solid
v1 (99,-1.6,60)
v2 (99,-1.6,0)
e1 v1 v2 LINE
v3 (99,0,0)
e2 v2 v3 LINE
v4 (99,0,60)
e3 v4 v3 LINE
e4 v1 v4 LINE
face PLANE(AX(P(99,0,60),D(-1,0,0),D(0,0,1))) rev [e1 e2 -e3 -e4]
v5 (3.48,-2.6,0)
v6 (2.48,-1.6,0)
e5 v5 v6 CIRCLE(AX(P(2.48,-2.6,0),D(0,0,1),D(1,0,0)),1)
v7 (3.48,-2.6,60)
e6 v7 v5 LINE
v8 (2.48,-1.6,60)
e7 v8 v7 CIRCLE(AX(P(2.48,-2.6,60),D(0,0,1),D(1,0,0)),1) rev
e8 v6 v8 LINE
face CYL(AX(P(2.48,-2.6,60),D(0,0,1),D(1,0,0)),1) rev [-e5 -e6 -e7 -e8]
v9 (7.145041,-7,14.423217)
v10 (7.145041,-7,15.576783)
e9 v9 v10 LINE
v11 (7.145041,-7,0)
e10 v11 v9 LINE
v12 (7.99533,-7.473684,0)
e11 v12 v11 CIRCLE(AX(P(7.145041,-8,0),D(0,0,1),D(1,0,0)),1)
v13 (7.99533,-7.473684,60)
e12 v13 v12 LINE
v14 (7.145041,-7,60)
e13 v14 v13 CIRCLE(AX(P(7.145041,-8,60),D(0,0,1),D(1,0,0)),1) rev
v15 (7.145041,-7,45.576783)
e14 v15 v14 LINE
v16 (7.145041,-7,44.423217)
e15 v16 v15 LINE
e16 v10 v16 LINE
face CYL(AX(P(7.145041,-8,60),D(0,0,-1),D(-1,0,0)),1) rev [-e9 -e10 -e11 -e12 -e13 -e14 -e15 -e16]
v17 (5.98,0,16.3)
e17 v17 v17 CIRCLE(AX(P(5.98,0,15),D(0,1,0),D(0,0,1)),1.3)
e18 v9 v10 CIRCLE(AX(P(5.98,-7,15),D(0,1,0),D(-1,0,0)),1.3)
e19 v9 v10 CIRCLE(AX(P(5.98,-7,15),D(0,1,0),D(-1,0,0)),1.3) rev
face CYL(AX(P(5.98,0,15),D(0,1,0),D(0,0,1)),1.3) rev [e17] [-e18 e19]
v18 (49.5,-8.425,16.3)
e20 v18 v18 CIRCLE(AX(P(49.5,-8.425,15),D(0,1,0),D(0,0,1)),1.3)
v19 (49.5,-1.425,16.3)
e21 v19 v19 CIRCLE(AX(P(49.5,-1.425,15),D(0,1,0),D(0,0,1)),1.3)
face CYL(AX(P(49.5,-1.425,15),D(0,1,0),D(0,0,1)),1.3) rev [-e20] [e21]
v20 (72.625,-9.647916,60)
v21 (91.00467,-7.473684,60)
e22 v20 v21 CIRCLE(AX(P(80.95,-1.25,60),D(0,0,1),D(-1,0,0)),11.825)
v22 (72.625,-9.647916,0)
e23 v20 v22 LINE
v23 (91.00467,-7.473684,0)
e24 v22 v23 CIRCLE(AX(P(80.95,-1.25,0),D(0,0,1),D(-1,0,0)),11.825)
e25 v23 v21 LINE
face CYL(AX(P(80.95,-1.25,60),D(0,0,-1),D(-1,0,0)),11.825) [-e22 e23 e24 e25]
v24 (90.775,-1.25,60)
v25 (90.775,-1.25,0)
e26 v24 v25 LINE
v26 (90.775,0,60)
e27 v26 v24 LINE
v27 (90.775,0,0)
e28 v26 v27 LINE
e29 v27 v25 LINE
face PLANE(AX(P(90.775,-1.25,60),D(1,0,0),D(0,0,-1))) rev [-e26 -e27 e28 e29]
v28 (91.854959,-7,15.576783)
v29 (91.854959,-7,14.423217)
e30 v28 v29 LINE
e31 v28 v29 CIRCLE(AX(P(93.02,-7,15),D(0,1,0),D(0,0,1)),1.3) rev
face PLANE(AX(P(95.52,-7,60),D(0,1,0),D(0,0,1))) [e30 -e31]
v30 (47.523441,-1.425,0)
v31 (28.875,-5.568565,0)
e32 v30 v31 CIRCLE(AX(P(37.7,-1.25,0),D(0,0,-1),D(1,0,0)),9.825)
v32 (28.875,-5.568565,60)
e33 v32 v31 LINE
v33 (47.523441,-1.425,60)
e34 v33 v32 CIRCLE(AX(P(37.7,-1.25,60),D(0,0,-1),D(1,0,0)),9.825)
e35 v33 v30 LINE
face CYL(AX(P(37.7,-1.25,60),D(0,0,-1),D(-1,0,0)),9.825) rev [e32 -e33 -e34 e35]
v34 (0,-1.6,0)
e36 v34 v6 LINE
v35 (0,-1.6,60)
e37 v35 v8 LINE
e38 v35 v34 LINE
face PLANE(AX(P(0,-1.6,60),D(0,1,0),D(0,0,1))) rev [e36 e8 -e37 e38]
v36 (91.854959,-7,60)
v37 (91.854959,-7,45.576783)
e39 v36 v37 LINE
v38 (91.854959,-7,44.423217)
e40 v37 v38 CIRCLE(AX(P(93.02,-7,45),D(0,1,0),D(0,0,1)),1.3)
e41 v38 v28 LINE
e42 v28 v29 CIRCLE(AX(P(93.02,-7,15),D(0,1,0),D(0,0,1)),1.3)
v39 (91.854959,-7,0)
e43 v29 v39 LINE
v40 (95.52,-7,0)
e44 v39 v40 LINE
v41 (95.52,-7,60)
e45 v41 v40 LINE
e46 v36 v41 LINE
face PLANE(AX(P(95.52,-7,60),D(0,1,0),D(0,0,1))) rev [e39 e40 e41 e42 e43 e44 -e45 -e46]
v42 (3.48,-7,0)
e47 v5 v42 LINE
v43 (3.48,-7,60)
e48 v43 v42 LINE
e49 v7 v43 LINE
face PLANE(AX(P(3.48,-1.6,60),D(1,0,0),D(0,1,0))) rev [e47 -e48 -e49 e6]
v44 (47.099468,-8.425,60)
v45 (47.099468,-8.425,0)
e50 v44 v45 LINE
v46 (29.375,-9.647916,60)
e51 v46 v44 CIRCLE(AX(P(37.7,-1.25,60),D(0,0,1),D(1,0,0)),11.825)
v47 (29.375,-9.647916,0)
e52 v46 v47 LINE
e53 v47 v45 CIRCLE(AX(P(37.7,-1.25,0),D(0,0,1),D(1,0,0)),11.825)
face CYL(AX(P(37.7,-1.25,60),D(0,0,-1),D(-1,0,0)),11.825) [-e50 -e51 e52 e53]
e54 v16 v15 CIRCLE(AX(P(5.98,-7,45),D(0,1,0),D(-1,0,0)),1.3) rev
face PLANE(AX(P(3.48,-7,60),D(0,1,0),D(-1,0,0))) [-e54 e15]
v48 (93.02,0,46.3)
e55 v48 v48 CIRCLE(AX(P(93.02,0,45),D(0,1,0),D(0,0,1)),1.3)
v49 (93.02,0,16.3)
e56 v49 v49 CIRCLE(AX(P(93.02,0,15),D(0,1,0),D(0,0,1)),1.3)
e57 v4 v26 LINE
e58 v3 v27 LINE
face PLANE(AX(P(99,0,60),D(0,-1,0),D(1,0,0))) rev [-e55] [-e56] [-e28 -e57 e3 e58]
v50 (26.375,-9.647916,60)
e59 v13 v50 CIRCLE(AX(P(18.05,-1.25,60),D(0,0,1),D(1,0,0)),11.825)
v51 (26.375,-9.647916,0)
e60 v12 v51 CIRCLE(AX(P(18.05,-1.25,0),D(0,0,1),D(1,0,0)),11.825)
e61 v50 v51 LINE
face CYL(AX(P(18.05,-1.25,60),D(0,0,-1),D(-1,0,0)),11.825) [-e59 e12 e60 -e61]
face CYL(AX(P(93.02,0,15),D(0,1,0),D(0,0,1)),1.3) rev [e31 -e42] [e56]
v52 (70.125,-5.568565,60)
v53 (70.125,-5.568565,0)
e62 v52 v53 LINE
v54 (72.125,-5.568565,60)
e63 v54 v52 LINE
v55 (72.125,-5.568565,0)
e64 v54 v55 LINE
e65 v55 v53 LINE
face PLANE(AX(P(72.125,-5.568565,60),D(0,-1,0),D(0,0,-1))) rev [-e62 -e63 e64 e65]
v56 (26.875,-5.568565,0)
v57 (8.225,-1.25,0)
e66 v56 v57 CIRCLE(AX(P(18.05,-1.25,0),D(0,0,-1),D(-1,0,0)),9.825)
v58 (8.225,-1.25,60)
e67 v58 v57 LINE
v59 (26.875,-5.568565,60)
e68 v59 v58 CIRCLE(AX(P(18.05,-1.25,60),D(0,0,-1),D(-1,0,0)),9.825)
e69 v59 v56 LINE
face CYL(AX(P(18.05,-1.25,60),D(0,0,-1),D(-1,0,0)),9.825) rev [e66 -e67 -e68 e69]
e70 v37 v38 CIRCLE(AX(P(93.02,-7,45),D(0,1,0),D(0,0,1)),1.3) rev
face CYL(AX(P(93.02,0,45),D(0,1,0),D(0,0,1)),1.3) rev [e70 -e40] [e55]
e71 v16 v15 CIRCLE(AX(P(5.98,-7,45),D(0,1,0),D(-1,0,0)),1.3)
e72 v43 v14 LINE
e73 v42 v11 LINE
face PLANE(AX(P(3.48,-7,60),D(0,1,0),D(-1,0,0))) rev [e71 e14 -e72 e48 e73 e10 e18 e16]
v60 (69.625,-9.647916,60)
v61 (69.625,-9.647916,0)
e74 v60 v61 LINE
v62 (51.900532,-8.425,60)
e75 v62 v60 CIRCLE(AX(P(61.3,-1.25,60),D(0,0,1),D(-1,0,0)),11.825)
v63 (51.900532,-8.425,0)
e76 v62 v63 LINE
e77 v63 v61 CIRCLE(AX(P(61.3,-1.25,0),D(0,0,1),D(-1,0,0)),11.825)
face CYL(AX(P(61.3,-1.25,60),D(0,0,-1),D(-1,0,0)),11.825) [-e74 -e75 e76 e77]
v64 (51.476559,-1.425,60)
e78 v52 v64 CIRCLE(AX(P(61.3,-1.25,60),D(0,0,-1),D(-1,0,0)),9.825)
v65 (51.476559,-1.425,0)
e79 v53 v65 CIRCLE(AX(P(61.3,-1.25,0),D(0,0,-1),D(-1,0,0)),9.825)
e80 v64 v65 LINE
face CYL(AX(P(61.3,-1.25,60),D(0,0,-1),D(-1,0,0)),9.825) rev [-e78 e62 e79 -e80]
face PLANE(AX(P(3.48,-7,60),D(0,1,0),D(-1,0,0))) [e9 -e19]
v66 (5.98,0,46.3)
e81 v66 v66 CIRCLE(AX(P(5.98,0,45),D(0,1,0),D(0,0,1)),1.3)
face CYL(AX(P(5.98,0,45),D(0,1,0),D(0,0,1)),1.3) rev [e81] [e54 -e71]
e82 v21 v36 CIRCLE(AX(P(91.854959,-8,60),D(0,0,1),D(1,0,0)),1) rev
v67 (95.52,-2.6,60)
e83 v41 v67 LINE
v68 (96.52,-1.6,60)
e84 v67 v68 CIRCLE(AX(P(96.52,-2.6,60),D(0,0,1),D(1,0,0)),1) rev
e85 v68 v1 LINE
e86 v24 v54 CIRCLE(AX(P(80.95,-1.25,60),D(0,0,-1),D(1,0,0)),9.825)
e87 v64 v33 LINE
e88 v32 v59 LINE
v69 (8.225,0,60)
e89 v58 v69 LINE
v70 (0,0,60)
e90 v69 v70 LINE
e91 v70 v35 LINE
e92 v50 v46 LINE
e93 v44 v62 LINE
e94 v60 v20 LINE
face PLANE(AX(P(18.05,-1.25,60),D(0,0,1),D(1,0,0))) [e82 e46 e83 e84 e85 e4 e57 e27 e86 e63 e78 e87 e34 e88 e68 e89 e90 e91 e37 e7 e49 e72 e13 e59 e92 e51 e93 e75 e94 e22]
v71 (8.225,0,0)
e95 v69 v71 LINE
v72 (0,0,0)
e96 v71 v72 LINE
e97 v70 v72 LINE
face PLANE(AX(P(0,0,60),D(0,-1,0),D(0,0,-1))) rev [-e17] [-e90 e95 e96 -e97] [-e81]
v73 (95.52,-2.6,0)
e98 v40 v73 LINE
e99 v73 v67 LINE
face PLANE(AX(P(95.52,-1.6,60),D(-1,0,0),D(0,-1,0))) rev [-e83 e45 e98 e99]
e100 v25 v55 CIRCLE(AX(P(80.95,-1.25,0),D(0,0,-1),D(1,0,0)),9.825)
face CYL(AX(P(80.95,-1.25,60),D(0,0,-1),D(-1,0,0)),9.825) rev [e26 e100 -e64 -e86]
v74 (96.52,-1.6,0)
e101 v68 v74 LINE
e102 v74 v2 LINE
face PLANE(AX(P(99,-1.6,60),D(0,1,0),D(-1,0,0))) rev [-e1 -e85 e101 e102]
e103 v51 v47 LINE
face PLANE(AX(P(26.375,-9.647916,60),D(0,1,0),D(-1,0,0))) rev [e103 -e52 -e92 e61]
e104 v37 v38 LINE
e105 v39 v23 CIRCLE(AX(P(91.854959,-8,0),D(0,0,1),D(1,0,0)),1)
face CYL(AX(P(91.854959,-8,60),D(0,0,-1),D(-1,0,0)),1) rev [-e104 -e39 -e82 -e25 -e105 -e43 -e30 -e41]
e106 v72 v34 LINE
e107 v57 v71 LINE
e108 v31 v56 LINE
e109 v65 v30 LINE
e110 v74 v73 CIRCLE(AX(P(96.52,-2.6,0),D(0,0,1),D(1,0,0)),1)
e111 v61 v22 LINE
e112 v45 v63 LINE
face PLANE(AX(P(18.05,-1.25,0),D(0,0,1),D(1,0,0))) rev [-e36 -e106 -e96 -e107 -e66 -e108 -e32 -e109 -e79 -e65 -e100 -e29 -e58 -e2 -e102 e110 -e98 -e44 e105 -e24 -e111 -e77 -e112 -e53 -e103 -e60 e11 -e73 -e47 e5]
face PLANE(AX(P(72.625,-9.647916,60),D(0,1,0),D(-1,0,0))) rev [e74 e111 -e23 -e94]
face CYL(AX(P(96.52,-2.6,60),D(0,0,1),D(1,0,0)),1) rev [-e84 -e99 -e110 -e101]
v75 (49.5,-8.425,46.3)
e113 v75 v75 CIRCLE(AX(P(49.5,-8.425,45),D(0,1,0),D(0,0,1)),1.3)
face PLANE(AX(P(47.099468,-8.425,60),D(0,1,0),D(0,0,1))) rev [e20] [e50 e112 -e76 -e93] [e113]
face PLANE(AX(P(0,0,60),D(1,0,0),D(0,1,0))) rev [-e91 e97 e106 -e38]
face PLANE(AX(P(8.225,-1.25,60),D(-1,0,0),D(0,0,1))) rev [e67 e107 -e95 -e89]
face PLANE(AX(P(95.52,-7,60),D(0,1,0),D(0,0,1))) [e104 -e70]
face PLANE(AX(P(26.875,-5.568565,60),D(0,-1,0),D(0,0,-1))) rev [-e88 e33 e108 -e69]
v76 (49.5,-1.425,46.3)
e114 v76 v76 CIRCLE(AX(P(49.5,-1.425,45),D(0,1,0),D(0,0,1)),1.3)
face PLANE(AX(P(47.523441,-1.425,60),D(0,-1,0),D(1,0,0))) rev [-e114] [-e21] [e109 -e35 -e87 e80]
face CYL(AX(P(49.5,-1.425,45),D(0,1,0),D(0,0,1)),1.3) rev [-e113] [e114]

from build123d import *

# Parameters (mm, degrees)
BOSS_EXTRUDE1_DEPTH                  = 60
FILLET1_R                            = 1
F_2_6_START                          = -7
F_2_6_2_6_DIAMETER_HOLE1_OUTLINE_R   = 1.3
F_2_6_2_6_DIAMETER_HOLE1_DEPTH       = 7
F_2_6_START_2                        = -8.425
F_2_6_2_6_DIAMETER_HOLE1_2_OUTLINE_R = 1.3
F_2_6_2_6_DIAMETER_HOLE1_2_DEPTH     = 1.425


# Read off the part's stored shape, not the designer's step: Ø2.6 (2.6) Diameter Hole1
with BuildPart() as part:
    # Sketch1 → Boss-Extrude1 (new body)
    with BuildSketch(Plane.XY):
        with BuildLine():
            Line((0, 0), (8.225, 0))
            Line((8.225, 0), (8.225, -1.25))
            ThreePointArc((8.225, -1.25), (15.833583974, -10.821735736), (26.875, -5.568564576))
            Line((26.875, -5.568564576), (28.875, -5.568564576))
            ThreePointArc((28.875, -5.568564576), (39.831080274, -10.841095968), (47.523441352, -1.425))
            Line((47.523441352, -1.425), (51.476558648, -1.425))
            ThreePointArc((51.476558648, -1.425), (59.168919726, -10.841095968), (70.125, -5.568564576))
            Line((70.125, -5.568564576), (72.125, -5.568564576))
            ThreePointArc((72.125, -5.568564576), (83.166416026, -10.821735736), (90.775, -1.25))
            Line((90.775, -1.25), (90.775, 0))
            Line((90.775, 0), (99, 0))
            Line((99, 0), (99, -1.6))
            Line((99, -1.6), (95.52, -1.6))
            Line((95.52, -1.6), (95.52, -7))
            Line((95.52, -7), (91.282866253, -7))
            ThreePointArc((91.282866253, -7), (82.611549593, -12.957684568), (72.625, -9.647916408))
            Line((72.625, -9.647916408), (69.625, -9.647916408))
            ThreePointArc((69.625, -9.647916408), (60.486058022, -13.046953991), (51.90053193, -8.425))
            Line((51.90053193, -8.425), (47.09946807, -8.425))
            ThreePointArc((47.09946807, -8.425), (38.513941978, -13.046953991), (29.375, -9.647916408))
            Line((29.375, -9.647916408), (26.375, -9.647916408))
            ThreePointArc((26.375, -9.647916408), (16.388450407, -12.957684568), (7.717133747, -7))
            Line((7.717133747, -7), (3.48, -7))
            Line((3.48, -7), (3.48, -1.6))
            Line((3.48, -1.6), (0, -1.6))
            Line((0, -1.6), (0, 0))
        make_face()
    extrude(amount=BOSS_EXTRUDE1_DEPTH)

    # Fillet1
    fillet1_edges = [part.edges().sort_by_distance(p)[0] for p in [
        (95.52, -1.6, 30),
        (91.282866253, -7, 30),
        (7.717133747, -7, 30),
        (3.48, -1.6, 30),
    ]]
    fillet(fillet1_edges, radius=FILLET1_R)

    # Ø2.6 (2.6) Diameter Hole1 outline → Ø2.6 (2.6) Diameter Hole1 (cut)
    with BuildSketch(Plane(origin=(0, 0, 0), x_dir=(1, 0, 0), z_dir=(0, 1, 0)).offset(F_2_6_START)):
        with Locations((93.02, -15)):
            Circle(F_2_6_2_6_DIAMETER_HOLE1_OUTLINE_R)
        with Locations((93.02, -45)):
            Circle(F_2_6_2_6_DIAMETER_HOLE1_OUTLINE_R)
        with Locations((49.5, -15)):
            Circle(F_2_6_2_6_DIAMETER_HOLE1_OUTLINE_R)
        with Locations((49.5, -45)):
            Circle(F_2_6_2_6_DIAMETER_HOLE1_OUTLINE_R)
    f_2_6_2_6_diameter_hole1 = extrude(amount=F_2_6_2_6_DIAMETER_HOLE1_DEPTH, mode=Mode.SUBTRACT)

    # 2.6 _2.6_ Diameter Hole1 2 outline → 2.6 _2.6_ Diameter Hole1 2 (cut)
    with BuildSketch(Plane(origin=(0, 0, 0), x_dir=(1, 0, 0), z_dir=(0, 1, 0)).offset(F_2_6_START_2)):
        with Locations((49.5, -15)):
            Circle(F_2_6_2_6_DIAMETER_HOLE1_2_OUTLINE_R)
        with Locations((49.5, -45)):
            Circle(F_2_6_2_6_DIAMETER_HOLE1_2_OUTLINE_R)
    f_2_6_2_6_diameter_hole1_2 = extrude(amount=F_2_6_2_6_DIAMETER_HOLE1_2_DEPTH, mode=Mode.SUBTRACT)

    # Mirror1: Ø2.6 (2.6) Diameter Hole1, 2.6 _2.6_ Diameter Hole1 2 across plane
    add(f_2_6_2_6_diameter_hole1.mirror(Plane.ZY.offset(-49.5)), mode=Mode.SUBTRACT)
    add(f_2_6_2_6_diameter_hole1_2.mirror(Plane.ZY.offset(-49.5)), mode=Mode.SUBTRACT)


solid = part.part
